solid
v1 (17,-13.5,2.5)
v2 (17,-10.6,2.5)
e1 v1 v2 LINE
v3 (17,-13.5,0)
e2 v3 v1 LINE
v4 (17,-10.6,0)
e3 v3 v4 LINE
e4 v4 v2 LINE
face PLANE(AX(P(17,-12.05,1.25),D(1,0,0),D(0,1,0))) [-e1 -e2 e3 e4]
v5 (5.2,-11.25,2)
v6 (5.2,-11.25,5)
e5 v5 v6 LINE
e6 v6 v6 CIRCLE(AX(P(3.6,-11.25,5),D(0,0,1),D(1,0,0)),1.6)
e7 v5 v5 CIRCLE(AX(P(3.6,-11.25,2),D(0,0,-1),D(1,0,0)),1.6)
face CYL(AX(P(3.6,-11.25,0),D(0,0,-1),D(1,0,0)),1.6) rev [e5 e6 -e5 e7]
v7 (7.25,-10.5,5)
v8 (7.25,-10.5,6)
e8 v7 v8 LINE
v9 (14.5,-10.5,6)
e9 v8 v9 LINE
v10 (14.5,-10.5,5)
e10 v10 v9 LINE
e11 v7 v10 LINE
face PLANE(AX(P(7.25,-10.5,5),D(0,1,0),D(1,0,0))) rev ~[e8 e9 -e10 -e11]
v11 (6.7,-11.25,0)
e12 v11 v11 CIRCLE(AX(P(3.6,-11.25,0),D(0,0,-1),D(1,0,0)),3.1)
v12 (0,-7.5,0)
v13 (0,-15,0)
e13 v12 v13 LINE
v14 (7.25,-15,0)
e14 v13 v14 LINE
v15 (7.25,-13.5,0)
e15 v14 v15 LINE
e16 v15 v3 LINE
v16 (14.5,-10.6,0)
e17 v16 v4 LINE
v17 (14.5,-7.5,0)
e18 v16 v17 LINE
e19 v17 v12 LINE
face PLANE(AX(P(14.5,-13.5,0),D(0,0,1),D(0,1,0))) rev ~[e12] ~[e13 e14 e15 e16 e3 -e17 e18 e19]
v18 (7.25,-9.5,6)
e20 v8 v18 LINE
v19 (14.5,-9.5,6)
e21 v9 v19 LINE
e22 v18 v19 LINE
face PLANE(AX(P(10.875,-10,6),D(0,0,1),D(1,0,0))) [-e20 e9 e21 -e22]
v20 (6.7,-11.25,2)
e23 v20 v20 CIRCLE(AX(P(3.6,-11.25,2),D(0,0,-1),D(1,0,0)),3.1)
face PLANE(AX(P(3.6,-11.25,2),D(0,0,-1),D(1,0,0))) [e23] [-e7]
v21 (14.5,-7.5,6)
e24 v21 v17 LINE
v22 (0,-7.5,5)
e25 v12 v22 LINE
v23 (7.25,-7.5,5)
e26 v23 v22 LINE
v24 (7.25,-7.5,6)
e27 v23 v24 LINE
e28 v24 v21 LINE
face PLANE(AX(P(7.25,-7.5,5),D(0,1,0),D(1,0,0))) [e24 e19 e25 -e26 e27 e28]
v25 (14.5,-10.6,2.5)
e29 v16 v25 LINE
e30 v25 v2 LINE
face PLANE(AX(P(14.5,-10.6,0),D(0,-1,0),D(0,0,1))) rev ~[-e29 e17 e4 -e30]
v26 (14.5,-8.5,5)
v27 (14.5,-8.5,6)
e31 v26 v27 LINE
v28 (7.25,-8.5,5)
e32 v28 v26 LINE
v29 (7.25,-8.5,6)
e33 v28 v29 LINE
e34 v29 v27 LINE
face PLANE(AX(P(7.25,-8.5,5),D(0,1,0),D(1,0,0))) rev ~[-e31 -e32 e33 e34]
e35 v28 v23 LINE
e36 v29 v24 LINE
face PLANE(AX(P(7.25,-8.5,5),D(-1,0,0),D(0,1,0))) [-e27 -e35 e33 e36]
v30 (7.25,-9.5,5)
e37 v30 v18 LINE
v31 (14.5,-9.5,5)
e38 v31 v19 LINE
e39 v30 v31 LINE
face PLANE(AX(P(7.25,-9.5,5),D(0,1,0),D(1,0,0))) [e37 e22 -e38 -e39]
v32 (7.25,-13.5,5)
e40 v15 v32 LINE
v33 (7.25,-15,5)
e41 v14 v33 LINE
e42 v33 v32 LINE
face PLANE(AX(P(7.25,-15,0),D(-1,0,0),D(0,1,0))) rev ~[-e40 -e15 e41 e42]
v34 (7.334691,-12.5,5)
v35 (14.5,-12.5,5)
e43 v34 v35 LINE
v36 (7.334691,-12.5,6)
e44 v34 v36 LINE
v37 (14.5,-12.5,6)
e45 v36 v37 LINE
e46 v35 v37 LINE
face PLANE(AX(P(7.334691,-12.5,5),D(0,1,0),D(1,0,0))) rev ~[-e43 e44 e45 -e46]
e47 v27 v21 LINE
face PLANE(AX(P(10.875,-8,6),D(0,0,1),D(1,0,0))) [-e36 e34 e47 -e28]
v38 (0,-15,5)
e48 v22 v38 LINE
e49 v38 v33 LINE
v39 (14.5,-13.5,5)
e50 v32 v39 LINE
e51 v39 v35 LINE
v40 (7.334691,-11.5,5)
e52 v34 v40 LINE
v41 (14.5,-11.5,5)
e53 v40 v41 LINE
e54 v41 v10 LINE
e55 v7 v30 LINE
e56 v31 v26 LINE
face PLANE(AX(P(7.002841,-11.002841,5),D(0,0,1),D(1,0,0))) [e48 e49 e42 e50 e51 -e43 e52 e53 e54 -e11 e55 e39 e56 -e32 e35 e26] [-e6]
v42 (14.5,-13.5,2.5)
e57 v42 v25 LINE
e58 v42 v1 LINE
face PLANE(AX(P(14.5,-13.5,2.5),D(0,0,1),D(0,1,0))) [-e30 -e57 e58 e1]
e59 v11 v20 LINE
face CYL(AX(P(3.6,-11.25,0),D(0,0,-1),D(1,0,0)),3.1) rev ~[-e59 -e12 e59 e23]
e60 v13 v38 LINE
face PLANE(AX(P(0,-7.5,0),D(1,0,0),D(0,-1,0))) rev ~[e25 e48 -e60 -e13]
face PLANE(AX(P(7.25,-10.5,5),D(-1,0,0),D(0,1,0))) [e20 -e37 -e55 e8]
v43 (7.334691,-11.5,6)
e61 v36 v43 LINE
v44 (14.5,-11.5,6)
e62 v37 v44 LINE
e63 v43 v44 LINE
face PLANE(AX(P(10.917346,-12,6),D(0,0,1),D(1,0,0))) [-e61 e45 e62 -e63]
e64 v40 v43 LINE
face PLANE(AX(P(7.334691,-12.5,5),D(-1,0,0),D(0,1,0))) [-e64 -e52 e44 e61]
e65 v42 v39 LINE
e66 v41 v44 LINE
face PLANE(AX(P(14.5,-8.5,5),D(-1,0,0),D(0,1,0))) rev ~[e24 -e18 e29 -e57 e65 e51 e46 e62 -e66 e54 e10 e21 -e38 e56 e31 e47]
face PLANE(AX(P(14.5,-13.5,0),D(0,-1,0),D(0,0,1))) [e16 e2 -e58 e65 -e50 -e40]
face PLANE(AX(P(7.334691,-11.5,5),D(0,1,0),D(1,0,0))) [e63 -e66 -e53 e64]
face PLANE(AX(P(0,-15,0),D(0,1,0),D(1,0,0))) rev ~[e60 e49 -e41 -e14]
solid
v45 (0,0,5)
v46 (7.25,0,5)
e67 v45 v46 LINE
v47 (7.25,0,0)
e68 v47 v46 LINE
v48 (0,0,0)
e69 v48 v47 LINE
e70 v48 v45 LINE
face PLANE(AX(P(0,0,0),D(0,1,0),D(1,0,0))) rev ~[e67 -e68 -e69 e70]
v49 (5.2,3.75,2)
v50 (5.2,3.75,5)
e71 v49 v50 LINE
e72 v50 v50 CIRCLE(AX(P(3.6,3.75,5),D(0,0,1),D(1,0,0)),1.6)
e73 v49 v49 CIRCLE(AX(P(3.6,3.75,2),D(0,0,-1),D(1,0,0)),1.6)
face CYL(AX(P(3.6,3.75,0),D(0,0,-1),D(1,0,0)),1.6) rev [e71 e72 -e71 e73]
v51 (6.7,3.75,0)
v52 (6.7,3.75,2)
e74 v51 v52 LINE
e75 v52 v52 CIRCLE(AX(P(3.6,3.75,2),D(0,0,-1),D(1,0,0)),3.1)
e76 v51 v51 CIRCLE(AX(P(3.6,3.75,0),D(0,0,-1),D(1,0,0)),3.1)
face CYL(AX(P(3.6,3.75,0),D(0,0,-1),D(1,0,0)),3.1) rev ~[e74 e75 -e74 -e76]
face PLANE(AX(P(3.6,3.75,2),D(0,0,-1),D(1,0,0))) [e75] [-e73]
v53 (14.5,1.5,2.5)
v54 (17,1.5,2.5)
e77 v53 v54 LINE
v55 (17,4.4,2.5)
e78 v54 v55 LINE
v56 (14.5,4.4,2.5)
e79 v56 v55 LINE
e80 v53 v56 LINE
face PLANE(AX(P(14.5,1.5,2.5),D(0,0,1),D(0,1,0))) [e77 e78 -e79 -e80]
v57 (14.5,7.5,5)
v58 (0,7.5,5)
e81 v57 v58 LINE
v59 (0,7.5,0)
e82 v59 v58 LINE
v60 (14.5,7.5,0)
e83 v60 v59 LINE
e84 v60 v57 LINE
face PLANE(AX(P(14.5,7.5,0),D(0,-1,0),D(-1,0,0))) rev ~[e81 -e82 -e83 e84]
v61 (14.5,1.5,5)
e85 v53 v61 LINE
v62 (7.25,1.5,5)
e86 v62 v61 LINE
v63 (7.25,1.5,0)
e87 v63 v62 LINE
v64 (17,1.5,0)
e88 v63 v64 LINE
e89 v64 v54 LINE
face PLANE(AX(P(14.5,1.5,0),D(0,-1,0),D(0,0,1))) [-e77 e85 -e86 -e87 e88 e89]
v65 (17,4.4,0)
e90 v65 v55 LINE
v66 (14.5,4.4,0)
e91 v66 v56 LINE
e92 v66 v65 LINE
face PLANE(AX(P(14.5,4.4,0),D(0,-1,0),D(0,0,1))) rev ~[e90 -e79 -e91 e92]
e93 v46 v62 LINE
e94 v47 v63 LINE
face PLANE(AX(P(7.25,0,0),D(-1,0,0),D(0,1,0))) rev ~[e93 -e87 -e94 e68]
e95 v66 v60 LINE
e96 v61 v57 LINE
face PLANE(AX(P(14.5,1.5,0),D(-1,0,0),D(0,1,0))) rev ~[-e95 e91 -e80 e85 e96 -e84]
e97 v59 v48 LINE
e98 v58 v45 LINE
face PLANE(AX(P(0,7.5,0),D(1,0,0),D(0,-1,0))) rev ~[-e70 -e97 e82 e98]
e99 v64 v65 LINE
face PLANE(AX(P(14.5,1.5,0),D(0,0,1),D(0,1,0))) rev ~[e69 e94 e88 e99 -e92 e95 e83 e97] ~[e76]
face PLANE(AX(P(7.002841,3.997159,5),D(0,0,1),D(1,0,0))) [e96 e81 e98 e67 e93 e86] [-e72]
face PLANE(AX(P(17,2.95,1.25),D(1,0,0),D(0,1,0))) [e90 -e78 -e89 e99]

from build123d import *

# Parameters (mm, degrees)
F0_R     = 1.6
F1_DEPTH = 5
F2_W     = 2.9
F2_H     = 2.5
F3_DEPTH = 2.5
F4_R     = 3.1
F4_R_2   = 1.6
F5_DEPTH = 2
F7_W     = 7.25
F7_H     = 1
F7_W_2   = 7.1653089933
F8_DEPTH = 1


with BuildPart() as f1:
    # F0 (on Top) → F1 (new body)
    with BuildSketch(Plane.XY):
        Polygon((0, 7.5), (0, 0), (7.25, 0), (7.25, 1.5), (14.5, 1.5), (14.5, 7.5), align=None)
        with Locations((3.6, 3.75)):
            Circle(F0_R, mode=Mode.SUBTRACT)
    extrude(amount=F1_DEPTH)

    # F2 (on face) → F3 (join)
    with BuildSketch(Plane.YZ.offset(14.5)):
        with Locations((2.95, 1.25)):
            Rectangle(F2_W, F2_H)
    extrude(amount=F3_DEPTH)

    # F4 (on face) → F5 (cut)
    with BuildSketch(Plane(origin=(0, 0, 0), x_dir=(1, 0, 0), z_dir=(0, 0, -1))):
        with Locations((3.6, -3.75)):
            Circle(F4_R)
        with Locations((3.6, -3.75)):
            Circle(F4_R_2, mode=Mode.SUBTRACT)
    extrude(amount=-F5_DEPTH, mode=Mode.SUBTRACT)


with BuildPart() as f6_1:
    # F6: copy of F1
    add(f1.part.moved(Location((0, -15, 0))))

    # F7 (on face) → F8 (join)
    with BuildSketch(Plane.XY.offset(5)):
        with Locations((10.875, -8)):
            Rectangle(F7_W, F7_H)
        with Locations((10.875, -10)):
            Rectangle(F7_W, F7_H)
        with Locations((10.9173455033, -12)):
            Rectangle(F7_W_2, F7_H)
    extrude(amount=F8_DEPTH)


solid = Compound([f1.part, f6_1.part])
